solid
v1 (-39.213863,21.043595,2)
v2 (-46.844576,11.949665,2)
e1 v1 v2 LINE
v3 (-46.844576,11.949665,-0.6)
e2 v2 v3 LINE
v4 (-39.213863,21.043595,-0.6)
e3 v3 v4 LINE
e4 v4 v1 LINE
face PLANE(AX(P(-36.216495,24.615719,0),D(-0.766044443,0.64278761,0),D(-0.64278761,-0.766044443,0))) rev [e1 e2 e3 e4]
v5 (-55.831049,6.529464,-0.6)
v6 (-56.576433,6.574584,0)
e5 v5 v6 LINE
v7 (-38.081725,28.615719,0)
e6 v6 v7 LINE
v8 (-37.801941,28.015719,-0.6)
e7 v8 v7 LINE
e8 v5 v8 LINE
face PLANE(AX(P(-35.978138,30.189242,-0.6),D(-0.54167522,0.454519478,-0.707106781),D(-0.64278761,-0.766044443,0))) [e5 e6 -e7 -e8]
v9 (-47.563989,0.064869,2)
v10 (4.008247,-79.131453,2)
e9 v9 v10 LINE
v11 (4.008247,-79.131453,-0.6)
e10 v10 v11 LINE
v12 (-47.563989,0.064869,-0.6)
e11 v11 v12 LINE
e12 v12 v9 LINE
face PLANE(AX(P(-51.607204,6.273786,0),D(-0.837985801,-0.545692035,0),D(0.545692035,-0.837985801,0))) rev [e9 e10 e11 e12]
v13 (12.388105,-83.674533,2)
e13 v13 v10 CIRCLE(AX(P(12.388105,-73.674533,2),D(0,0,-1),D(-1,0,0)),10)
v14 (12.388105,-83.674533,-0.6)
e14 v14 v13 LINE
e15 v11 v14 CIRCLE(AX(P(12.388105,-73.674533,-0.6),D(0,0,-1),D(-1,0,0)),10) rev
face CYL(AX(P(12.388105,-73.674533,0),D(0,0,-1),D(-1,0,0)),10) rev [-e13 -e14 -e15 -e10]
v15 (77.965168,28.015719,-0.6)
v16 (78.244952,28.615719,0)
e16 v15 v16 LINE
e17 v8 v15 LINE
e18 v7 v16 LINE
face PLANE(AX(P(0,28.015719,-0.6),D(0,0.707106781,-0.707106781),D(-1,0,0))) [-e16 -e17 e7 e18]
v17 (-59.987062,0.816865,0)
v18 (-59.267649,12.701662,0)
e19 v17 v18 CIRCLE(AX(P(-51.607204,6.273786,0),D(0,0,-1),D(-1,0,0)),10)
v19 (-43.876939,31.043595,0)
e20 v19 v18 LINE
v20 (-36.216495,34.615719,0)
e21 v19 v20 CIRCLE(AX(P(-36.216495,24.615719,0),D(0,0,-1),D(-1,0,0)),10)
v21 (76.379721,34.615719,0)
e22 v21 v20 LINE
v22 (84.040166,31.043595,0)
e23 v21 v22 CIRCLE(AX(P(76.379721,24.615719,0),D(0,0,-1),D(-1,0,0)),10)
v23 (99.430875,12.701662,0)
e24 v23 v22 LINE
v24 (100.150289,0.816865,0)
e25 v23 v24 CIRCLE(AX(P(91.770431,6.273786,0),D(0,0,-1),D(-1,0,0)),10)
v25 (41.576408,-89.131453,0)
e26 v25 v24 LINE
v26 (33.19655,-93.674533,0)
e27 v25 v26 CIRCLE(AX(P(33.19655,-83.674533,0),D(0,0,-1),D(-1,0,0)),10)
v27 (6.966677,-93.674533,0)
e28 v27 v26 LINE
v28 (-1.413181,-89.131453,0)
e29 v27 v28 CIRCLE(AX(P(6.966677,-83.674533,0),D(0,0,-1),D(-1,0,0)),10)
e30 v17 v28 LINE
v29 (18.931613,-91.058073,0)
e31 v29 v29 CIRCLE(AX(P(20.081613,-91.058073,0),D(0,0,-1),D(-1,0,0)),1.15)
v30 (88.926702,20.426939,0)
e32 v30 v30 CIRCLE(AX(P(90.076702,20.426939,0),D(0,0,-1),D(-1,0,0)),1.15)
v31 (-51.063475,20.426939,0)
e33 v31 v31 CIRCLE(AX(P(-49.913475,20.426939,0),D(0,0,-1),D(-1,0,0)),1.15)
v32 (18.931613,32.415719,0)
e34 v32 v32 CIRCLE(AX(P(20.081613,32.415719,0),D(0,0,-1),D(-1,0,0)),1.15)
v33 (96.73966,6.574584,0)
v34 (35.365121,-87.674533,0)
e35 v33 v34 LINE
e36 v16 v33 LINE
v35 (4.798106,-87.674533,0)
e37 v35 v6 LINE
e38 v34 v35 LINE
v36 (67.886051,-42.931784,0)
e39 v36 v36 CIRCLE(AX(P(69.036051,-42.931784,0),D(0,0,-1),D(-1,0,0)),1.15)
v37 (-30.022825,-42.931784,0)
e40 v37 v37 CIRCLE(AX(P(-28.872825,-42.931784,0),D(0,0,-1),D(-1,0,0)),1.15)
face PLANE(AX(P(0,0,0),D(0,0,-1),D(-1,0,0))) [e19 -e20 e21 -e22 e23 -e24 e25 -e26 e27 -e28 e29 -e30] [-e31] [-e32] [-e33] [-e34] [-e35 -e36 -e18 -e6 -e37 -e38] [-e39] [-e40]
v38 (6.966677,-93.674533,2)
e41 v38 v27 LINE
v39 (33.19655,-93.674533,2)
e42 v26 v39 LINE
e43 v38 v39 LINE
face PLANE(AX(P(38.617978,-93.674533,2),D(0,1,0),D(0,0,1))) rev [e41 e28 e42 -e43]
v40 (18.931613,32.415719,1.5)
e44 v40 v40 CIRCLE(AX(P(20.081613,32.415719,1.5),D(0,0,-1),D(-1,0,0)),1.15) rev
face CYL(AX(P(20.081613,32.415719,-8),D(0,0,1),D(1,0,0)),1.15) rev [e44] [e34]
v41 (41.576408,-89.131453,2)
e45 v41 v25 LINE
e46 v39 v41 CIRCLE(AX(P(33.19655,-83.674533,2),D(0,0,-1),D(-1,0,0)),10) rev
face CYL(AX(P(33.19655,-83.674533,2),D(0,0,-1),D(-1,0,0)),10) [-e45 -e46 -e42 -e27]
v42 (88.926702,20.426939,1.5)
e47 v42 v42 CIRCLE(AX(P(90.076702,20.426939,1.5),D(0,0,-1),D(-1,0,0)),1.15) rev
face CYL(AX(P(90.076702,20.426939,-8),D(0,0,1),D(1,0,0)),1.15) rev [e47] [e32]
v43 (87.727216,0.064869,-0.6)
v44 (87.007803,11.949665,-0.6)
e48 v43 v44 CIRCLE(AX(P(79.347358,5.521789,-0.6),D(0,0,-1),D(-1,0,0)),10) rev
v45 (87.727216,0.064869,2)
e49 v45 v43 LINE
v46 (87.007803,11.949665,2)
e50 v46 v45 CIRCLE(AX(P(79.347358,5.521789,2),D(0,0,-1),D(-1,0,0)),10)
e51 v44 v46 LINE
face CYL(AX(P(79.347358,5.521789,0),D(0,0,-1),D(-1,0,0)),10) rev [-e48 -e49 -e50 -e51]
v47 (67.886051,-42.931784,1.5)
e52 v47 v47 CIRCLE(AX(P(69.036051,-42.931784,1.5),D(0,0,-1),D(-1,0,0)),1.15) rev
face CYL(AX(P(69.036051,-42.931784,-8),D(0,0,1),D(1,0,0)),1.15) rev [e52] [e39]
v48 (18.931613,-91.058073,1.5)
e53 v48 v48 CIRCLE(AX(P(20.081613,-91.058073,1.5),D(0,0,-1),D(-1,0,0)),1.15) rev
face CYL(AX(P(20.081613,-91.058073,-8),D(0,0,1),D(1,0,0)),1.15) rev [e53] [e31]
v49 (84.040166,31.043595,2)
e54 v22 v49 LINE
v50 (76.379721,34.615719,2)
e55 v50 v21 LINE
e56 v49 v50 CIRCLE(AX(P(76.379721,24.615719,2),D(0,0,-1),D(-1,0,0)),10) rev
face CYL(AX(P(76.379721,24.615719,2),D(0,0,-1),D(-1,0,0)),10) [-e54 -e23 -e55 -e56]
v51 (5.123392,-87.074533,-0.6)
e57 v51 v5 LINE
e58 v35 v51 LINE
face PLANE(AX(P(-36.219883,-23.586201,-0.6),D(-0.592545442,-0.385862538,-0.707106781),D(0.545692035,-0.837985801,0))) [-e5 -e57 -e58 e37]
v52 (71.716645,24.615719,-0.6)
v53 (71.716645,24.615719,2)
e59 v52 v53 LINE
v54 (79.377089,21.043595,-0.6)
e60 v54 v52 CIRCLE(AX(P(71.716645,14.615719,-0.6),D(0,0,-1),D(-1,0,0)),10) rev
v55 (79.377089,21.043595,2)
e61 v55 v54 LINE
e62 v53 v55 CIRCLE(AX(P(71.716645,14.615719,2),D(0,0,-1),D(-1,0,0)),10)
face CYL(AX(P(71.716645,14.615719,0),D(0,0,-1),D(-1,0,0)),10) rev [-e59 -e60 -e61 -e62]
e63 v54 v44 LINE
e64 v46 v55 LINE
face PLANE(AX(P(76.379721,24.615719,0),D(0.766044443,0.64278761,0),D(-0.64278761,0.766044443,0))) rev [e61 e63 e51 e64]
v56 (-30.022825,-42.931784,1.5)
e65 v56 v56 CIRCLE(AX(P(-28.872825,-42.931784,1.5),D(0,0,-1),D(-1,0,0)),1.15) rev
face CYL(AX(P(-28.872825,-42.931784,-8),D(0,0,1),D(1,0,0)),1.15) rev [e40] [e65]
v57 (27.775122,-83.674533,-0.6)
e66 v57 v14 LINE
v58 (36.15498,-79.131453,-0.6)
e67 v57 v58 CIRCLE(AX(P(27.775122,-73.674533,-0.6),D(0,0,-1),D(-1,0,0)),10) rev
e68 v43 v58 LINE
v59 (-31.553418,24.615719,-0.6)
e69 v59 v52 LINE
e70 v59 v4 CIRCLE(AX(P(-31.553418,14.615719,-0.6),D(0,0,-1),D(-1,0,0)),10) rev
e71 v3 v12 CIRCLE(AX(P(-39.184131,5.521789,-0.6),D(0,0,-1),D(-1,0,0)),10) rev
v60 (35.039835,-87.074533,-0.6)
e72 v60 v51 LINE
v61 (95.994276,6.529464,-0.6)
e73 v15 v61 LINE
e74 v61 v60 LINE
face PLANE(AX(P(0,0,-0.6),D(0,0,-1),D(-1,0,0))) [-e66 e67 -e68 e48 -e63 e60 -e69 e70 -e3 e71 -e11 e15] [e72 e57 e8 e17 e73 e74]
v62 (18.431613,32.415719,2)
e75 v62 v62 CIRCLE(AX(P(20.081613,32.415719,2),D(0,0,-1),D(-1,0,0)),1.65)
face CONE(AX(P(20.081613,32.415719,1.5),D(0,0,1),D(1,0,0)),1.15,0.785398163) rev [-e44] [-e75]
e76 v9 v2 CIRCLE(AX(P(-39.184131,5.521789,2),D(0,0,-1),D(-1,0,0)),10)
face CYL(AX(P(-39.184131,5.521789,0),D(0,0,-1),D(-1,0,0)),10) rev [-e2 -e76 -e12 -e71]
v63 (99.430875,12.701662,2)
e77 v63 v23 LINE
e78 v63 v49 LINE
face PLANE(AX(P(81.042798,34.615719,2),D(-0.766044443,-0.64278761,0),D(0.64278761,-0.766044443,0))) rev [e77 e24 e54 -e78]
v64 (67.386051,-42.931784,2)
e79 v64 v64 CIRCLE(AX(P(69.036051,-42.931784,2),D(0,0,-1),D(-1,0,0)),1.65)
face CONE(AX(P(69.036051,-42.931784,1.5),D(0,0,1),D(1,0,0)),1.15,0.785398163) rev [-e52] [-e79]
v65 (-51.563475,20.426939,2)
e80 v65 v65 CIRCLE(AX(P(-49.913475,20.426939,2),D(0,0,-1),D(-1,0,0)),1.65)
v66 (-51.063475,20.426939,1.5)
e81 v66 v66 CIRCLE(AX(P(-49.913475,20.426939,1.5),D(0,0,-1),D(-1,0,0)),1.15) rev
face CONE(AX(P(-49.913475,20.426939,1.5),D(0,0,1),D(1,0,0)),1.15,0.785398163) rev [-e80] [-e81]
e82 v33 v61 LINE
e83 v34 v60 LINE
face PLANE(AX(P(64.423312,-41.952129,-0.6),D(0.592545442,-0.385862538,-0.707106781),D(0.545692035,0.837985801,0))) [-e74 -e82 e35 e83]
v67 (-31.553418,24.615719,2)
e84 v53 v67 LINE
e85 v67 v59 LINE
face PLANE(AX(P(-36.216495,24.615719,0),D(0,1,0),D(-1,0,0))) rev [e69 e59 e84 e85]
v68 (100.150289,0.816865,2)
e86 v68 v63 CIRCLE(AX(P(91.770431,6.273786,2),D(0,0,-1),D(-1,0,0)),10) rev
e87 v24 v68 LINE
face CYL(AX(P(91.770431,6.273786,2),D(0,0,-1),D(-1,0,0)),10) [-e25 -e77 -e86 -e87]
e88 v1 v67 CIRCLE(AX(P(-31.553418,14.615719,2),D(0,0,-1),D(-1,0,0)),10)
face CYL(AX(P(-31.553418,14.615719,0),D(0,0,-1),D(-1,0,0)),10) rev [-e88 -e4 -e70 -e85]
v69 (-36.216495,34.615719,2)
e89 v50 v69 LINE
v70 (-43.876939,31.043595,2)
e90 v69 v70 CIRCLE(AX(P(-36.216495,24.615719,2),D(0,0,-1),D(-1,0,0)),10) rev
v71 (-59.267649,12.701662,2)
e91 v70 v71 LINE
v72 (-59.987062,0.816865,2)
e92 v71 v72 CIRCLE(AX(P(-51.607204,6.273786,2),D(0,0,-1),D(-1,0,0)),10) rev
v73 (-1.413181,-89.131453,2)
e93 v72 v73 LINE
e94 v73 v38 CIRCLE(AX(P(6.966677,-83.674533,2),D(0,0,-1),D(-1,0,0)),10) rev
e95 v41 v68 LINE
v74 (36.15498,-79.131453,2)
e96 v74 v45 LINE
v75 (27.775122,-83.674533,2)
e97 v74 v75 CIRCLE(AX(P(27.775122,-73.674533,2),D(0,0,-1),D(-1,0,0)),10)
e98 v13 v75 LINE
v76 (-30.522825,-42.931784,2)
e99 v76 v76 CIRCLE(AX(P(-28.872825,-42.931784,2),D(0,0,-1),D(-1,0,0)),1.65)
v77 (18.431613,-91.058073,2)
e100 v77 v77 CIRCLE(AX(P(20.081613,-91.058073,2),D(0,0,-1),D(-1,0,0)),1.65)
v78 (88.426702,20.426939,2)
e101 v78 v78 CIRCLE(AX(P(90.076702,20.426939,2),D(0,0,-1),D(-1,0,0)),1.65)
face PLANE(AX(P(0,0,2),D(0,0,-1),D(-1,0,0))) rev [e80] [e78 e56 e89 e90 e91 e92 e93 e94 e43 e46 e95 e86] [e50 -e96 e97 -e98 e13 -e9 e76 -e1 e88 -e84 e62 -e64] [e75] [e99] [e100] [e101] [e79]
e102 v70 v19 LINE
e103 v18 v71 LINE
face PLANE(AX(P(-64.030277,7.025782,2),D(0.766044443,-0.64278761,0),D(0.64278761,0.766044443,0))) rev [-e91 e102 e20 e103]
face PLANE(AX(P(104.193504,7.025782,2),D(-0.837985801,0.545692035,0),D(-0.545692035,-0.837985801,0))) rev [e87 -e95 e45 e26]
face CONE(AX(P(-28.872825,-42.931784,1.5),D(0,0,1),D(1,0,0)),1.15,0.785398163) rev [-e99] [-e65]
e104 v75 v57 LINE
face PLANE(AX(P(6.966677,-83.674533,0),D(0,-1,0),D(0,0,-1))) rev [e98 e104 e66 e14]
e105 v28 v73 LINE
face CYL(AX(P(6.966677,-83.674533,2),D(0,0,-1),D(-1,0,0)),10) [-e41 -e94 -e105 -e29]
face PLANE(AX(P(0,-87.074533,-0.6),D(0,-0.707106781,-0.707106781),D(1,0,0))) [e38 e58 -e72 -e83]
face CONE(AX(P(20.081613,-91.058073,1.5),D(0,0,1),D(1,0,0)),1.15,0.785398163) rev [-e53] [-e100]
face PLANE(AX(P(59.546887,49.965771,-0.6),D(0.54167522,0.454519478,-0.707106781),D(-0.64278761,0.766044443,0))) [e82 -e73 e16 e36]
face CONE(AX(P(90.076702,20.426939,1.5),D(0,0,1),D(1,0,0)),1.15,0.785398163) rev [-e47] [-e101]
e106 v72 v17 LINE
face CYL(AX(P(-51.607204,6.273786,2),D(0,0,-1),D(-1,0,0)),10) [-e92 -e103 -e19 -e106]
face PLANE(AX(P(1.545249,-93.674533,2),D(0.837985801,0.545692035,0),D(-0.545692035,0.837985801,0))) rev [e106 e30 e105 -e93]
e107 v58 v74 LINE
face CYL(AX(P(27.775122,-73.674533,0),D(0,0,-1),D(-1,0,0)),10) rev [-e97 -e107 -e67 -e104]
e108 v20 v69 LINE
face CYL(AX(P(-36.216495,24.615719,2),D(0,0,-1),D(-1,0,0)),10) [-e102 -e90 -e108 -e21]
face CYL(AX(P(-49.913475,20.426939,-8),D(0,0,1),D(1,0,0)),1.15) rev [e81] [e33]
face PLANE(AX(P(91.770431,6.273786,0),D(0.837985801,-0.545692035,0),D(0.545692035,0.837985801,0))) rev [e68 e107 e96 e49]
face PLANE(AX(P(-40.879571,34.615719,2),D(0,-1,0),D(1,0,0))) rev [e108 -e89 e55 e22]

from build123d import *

# Parameters (mm, degrees)
BOSS_EXTRU_1_DEPTH      = 2
CONG_1_R                = 10
ENL_V_MAT_EXTRU_1_DEPTH = 2
BOSS_EXTRU_2_DEPTH      = 0.6
CONG_2_R                = 10
ESQUISSE3_R             = 1.15
ENL_V_MAT_EXTRU_2_DEPTH = 10
CHANFREIN1_SIZE         = 0.5
CHANFREIN3_SIZE         = 0.6


with BuildPart() as part:
    # Esquisse1 → Boss.-Extru.1 (new body)
    with BuildSketch(Plane.XY):
        Polygon((-40.879571388, 34.615718895), (81.042798068, 34.615718895), (104.193503713, 7.025782272), (38.617977526, -93.674532757), (1.545249154, -93.674532757), (-64.030277033, 7.025782272), align=None)
    extrude(amount=BOSS_EXTRU_1_DEPTH)

    # Congé1
    cong_1_edges = [part.edges().sort_by_distance(p)[0] for p in [
        (-40.879571388, 34.615718895, 1),
        (81.042798068, 34.615718895, 1),
        (104.193503713, 7.025782272, 1),
        (38.617977526, -93.674532757, 1),
        (1.545249154, -93.674532757, 1),
        (-64.030277033, 7.025782272, 1),
    ]]
    fillet(cong_1_edges, radius=CONG_1_R)

    # Esquisse2 → Enlèv. mat.-Extru.1 (cut)
    with BuildSketch(Plane.XY.offset(2)):
        Polygon((-36.216494806, 24.615718895), (-51.607204261, 6.27378561), (6.96667711, -83.674532757), (33.19654957, -83.674532757), (91.770430941, 6.27378561), (76.379721487, 24.615718895), align=None)
    extrude(amount=-ENL_V_MAT_EXTRU_1_DEPTH, mode=Mode.SUBTRACT)

    # Esquisse4 → Boss.-Extru.2 (add)
    with BuildSketch(Plane(origin=(0, 0, 0), x_dir=(-1, 0, 0), z_dir=(0, 0, -1))):
        Polygon((-78.244952119, 28.615718895), (-96.73966005, 6.574584275), (-35.365120753, -87.674532757), (-4.798105928, -87.674532757), (56.57643337, 6.574584275), (38.081725439, 28.615718895), align=None)
        Polygon((-76.379721487, 24.615718895), (-91.770430941, 6.27378561), (-33.19654957, -83.674532757), (-6.96667711, -83.674532757), (51.607204261, 6.27378561), (36.216494806, 24.615718895), align=None, mode=Mode.SUBTRACT)
    extrude(amount=BOSS_EXTRU_2_DEPTH)

    # Congé2
    cong_2_edges = [part.edges().sort_by_distance(p)[0] for p in [
        (-36.216494806, 24.615718895, 0.7),
        (76.379721487, 24.615718895, 0.7),
        (91.770430941, 6.27378561, 0.7),
        (33.19654957, -83.674532757, 0.7),
        (6.96667711, -83.674532757, 0.7),
        (-51.607204261, 6.27378561, 0.7),
    ]]
    fillet(cong_2_edges, radius=CONG_2_R)

    # Esquisse3 → Enlèv. mat.-Extru.2 (cut)
    with BuildSketch(Plane.XY.offset(2)):
        with Locations((20.08161334, -91.058073416)):
            Circle(ESQUISSE3_R)
        with Locations((-28.872824595, -42.931783887)):
            Circle(ESQUISSE3_R)
        with Locations((20.08161334, 32.415718895)):
            Circle(ESQUISSE3_R)
        with Locations((90.076701777, 20.426939275)):
            Circle(ESQUISSE3_R)
        with Locations((69.036051275, -42.931783887)):
            Circle(ESQUISSE3_R)
        with Locations((-49.913475097, 20.426939275)):
            Circle(ESQUISSE3_R)
    extrude(amount=-ENL_V_MAT_EXTRU_2_DEPTH, mode=Mode.SUBTRACT)

    # Chanfrein1
    chanfrein1_edges = [part.edges().sort_by_distance(p)[0] for p in [
        (-51.063475097, 20.426939275, 2),
        (67.886051275, -42.931783887, 2),
        (88.926701777, 20.426939275, 2),
        (18.93161334, 32.415718895, 2),
        (-30.022824595, -42.931783887, 2),
        (18.93161334, -91.058073416, 2),
    ]]
    chamfer(chanfrein1_edges, length=CHANFREIN1_SIZE)

    # Chanfrein3
    chanfrein3_edges = [part.edges().sort_by_distance(p)[0] for p in [
        (87.492306084, 17.595151585, -0.6),
        (20.08161334, 28.615718895, -0.6),
        (-47.329079404, 17.595151585, -0.6),
        (-25.889163721, -40.549974241, -0.6),
        (20.08161334, -87.674532757, -0.6),
        (66.052390401, -40.549974241, -0.6),
    ]]
    chamfer(chanfrein3_edges, length=CHANFREIN3_SIZE - 0.0001)  # a hair under: the kernel refuses the full size


solid = part.part
